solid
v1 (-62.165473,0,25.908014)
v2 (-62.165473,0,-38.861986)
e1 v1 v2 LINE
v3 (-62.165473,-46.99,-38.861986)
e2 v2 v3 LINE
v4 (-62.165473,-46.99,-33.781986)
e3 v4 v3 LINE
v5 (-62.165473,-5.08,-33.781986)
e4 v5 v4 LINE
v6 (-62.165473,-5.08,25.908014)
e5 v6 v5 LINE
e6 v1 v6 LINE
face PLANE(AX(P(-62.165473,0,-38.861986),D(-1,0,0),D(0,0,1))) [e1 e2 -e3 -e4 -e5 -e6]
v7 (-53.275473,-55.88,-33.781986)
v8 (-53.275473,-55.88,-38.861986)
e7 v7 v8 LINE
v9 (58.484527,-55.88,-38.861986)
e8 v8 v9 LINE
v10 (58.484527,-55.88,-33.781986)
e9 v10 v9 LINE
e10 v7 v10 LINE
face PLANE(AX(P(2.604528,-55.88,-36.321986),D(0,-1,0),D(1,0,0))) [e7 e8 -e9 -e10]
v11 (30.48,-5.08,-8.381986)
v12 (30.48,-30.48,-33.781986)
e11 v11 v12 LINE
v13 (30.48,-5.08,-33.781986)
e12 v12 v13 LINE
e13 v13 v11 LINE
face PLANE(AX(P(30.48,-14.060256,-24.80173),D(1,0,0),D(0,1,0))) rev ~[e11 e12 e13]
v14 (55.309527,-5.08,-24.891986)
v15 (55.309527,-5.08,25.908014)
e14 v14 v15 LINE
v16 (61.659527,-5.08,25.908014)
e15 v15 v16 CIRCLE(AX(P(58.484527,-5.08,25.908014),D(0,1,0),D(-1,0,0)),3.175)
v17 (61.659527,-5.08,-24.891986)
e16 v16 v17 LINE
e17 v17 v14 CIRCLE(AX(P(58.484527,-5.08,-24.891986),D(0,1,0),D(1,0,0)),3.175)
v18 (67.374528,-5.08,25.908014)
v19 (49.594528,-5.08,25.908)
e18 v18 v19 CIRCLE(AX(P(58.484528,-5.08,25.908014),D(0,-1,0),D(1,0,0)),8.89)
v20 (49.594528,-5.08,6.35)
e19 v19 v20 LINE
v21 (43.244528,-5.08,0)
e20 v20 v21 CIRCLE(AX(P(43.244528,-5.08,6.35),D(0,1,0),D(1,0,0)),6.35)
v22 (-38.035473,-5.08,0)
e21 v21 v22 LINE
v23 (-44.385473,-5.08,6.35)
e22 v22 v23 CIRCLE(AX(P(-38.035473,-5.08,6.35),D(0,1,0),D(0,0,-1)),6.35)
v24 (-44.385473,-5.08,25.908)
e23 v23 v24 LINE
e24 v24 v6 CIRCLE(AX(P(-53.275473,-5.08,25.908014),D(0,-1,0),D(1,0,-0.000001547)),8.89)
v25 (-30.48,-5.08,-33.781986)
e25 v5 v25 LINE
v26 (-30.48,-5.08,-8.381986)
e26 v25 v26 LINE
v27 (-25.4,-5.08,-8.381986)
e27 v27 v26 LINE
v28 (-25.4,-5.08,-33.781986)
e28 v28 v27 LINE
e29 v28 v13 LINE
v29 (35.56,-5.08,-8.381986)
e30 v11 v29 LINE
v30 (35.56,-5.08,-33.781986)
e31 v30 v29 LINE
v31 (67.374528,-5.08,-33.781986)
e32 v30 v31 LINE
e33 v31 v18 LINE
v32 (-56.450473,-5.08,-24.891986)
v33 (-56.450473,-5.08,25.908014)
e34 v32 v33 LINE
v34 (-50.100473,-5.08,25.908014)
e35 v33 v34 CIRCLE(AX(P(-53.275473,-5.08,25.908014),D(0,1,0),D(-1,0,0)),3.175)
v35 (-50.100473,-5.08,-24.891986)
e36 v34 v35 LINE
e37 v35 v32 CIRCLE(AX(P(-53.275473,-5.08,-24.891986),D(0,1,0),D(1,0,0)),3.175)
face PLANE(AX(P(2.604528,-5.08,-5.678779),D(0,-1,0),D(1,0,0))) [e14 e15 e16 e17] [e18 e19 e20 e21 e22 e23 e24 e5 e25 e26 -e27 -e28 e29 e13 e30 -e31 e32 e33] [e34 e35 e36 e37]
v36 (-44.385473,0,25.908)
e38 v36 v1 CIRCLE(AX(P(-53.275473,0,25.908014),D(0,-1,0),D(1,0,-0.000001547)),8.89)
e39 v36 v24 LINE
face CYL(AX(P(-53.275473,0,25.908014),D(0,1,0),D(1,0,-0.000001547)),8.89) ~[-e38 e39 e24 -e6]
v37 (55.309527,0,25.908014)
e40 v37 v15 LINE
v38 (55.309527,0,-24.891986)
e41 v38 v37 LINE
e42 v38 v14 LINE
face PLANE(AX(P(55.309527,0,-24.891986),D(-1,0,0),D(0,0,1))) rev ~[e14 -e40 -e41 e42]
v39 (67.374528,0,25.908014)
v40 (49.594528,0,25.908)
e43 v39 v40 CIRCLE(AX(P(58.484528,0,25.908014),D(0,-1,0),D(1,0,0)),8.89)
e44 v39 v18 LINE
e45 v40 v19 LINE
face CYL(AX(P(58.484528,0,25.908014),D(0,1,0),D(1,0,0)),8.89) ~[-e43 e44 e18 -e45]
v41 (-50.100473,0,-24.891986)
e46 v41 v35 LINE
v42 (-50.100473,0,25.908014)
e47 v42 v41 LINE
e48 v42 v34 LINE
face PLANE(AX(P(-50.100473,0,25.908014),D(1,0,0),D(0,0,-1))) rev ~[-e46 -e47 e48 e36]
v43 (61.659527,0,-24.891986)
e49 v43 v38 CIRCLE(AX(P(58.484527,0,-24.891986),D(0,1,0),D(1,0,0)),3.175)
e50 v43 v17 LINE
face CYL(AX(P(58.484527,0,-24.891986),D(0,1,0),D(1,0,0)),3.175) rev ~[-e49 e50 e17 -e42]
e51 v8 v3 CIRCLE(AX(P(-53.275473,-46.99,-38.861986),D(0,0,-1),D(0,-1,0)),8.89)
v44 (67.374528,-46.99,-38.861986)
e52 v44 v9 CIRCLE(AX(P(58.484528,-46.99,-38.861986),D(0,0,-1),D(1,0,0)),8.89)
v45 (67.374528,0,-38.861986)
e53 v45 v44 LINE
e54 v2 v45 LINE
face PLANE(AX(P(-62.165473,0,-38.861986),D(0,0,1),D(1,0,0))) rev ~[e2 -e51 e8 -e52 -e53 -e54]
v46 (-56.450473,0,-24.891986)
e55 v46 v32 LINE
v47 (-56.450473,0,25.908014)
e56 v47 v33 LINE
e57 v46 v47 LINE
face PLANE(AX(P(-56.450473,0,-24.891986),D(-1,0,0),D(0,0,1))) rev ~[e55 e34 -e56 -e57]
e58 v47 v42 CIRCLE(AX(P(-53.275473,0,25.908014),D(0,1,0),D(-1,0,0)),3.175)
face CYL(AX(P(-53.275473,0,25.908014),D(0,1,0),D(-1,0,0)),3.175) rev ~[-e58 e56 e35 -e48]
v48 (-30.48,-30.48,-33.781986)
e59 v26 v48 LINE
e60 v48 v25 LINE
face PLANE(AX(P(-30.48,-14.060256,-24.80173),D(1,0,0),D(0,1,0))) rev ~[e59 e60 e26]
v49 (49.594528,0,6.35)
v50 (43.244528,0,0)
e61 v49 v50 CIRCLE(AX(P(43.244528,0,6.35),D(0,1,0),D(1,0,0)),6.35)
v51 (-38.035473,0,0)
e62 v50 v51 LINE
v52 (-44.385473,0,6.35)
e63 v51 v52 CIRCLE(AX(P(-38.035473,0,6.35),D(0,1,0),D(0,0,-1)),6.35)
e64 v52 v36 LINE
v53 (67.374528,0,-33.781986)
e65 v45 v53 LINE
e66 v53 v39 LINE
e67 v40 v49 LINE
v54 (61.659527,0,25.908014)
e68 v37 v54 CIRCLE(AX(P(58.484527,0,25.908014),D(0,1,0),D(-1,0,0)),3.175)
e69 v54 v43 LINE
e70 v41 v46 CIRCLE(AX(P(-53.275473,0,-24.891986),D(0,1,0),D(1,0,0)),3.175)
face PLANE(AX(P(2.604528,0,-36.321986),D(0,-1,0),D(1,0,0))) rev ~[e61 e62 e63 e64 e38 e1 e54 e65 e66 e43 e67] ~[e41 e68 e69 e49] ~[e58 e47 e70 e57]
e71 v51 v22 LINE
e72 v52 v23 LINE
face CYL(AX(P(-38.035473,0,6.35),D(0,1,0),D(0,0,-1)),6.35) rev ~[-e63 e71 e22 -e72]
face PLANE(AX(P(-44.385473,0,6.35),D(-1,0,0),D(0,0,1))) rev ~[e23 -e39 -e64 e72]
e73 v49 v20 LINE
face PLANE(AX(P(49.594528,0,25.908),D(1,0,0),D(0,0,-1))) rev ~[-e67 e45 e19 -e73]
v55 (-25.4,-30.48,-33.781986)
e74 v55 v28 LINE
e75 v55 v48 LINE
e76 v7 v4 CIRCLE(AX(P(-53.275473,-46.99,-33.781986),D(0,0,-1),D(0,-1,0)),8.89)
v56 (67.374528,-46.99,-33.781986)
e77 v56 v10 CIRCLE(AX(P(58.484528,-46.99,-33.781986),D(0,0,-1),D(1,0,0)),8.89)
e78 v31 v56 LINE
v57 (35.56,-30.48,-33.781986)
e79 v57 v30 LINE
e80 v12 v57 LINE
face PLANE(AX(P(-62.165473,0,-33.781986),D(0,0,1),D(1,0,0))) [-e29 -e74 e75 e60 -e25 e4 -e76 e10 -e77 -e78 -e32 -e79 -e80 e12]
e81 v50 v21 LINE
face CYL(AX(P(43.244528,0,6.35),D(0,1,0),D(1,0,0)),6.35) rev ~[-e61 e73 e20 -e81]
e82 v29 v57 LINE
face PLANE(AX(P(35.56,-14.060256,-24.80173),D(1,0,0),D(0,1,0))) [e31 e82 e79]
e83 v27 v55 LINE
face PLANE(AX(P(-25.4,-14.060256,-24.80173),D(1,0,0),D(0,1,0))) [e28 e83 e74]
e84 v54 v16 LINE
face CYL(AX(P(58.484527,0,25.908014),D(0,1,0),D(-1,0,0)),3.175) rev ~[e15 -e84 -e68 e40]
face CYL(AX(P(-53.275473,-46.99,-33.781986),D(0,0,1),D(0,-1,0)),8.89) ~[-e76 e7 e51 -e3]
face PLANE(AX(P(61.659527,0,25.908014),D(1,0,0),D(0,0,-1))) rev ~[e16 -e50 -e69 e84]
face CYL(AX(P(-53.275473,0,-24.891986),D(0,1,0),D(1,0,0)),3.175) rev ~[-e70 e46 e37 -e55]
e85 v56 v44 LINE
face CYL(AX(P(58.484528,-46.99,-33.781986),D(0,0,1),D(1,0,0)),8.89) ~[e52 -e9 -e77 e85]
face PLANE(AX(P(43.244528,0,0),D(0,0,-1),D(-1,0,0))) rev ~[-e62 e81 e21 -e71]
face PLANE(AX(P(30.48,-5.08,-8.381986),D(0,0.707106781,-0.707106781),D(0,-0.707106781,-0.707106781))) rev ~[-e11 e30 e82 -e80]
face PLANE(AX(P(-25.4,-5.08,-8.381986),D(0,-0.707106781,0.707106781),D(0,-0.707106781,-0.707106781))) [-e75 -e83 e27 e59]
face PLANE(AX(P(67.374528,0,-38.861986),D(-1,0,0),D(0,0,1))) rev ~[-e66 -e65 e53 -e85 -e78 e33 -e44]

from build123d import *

# Parameters (mm, degrees)
F1_DEPTH = 5.08
F0_W     = 129.5400008702
F0_H     = 5.08
F2_DEPTH = 55.88
F4_DEPTH = 5.08
F6_START = 30.48
F6_DEPTH = 5.08
F7_START = -25.4
F7_DEPTH = 5.08


# Not quite as in the source:
# - a feature names something its author has since deleted; it is built from what else it names


with BuildPart() as f1:
    # F0 (on Front) → F1 (new body)
    with BuildSketch(Plane.XZ):
        with BuildLine():
            Line((-62.1654726565, 25.9080137503), (-62.1654726565, -33.7819862497))
            Line((-62.1654726565, -33.7819862497), (67.3745282138, -33.7819862497))
            Line((67.3745282138, -33.7819862497), (67.3745282138, 25.9080137503))
            ThreePointArc((67.3745282138, 25.9080137503), (58.4845213386, 34.7980137503), (49.5945282137, 25.908))
            Line((49.5945282137, 25.908), (49.5945282137, 6.35))
            ThreePointArc((49.5945282137, 6.35), (47.7346562743, 1.8598719395), (43.2445282137, 0))
            Line((43.2445282137, 0), (-38.0354726565, 0))
            ThreePointArc((-38.0354726565, 0), (-42.525600717, 1.8598719395), (-44.3854726565, 6.35))
            Line((-44.3854726565, 6.35), (-44.3854726565, 25.908))
            ThreePointArc((-44.3854726565, 25.908), (-53.2754657813, 34.7980137503), (-62.1654726565, 25.9080137503))
        make_face()
        with BuildLine():
            ThreePointArc((-56.4504726565, 25.9080137503), (-53.2754726565, 29.0830137503), (-50.1004726565, 25.9080137503))
            Line((-50.1004726565, 25.9080137503), (-50.1004726565, -24.8919862497))
            ThreePointArc((-50.1004726565, -24.8919862497), (-53.2754726565, -28.0669862497), (-56.4504726565, -24.8919862497))
            Line((-56.4504726565, -24.8919862497), (-56.4504726565, 25.9080137503))
        make_face(mode=Mode.SUBTRACT)
        with BuildLine():
            ThreePointArc((55.3095273435, 25.9080137503), (58.4845273435, 29.0830137503), (61.6595273435, 25.9080137503))
            Line((61.6595273435, 25.9080137503), (61.6595273435, -24.8919862497))
            ThreePointArc((61.6595273435, -24.8919862497), (58.4845273435, -28.0669862497), (55.3095273435, -24.8919862497))
            Line((55.3095273435, -24.8919862497), (55.3095273435, 25.9080137503))
        make_face(mode=Mode.SUBTRACT)
    extrude(amount=F1_DEPTH)

    # F0 (on Front) → F2 (join)
    with BuildSketch(Plane.XZ):
        with Locations((2.6045277786, -36.3219862497)):
            Rectangle(F0_W, F0_H)
    extrude(amount=F2_DEPTH)

    # F3 (on face) → F4 (cut)
    with BuildSketch(Plane.XY.offset(-33.7819862497)):
        with BuildLine():
            ThreePointArc((-53.2754726565, -55.88), (-59.5616519412, -53.2761792847), (-62.1654726565, -46.99))
            Line((-62.1654726565, -46.99), (-62.1654726565, -55.88))
            Line((-62.1654726565, -55.88), (-53.2754726565, -55.88))
        make_face()
        with BuildLine():
            ThreePointArc((67.3745282138, -46.99), (64.7707071908, -53.2761795924), (58.4845273435, -55.88))
            Line((58.4845273435, -55.88), (67.3745282138, -55.88))
            Line((67.3745282138, -55.88), (67.3745282138, -46.99))
        make_face()
    extrude(amount=-F4_DEPTH, mode=Mode.SUBTRACT)

    # F5 (on Right) → F6 (join)
    with BuildSketch(Plane.YZ.offset(F6_START)):
        Polygon((-5.08, -33.7819862497), (-5.08, -8.3819862497), (-30.48, -33.7819862497), align=None)
    extrude(amount=F6_DEPTH)

    # F5 (on Right) → F7 (join)
    with BuildSketch(Plane.YZ.offset(F7_START)):
        Polygon((-5.08, -33.7819862497), (-5.08, -8.3819862497), (-30.48, -33.7819862497), align=None)
    extrude(amount=-F7_DEPTH)


solid = f1.part
